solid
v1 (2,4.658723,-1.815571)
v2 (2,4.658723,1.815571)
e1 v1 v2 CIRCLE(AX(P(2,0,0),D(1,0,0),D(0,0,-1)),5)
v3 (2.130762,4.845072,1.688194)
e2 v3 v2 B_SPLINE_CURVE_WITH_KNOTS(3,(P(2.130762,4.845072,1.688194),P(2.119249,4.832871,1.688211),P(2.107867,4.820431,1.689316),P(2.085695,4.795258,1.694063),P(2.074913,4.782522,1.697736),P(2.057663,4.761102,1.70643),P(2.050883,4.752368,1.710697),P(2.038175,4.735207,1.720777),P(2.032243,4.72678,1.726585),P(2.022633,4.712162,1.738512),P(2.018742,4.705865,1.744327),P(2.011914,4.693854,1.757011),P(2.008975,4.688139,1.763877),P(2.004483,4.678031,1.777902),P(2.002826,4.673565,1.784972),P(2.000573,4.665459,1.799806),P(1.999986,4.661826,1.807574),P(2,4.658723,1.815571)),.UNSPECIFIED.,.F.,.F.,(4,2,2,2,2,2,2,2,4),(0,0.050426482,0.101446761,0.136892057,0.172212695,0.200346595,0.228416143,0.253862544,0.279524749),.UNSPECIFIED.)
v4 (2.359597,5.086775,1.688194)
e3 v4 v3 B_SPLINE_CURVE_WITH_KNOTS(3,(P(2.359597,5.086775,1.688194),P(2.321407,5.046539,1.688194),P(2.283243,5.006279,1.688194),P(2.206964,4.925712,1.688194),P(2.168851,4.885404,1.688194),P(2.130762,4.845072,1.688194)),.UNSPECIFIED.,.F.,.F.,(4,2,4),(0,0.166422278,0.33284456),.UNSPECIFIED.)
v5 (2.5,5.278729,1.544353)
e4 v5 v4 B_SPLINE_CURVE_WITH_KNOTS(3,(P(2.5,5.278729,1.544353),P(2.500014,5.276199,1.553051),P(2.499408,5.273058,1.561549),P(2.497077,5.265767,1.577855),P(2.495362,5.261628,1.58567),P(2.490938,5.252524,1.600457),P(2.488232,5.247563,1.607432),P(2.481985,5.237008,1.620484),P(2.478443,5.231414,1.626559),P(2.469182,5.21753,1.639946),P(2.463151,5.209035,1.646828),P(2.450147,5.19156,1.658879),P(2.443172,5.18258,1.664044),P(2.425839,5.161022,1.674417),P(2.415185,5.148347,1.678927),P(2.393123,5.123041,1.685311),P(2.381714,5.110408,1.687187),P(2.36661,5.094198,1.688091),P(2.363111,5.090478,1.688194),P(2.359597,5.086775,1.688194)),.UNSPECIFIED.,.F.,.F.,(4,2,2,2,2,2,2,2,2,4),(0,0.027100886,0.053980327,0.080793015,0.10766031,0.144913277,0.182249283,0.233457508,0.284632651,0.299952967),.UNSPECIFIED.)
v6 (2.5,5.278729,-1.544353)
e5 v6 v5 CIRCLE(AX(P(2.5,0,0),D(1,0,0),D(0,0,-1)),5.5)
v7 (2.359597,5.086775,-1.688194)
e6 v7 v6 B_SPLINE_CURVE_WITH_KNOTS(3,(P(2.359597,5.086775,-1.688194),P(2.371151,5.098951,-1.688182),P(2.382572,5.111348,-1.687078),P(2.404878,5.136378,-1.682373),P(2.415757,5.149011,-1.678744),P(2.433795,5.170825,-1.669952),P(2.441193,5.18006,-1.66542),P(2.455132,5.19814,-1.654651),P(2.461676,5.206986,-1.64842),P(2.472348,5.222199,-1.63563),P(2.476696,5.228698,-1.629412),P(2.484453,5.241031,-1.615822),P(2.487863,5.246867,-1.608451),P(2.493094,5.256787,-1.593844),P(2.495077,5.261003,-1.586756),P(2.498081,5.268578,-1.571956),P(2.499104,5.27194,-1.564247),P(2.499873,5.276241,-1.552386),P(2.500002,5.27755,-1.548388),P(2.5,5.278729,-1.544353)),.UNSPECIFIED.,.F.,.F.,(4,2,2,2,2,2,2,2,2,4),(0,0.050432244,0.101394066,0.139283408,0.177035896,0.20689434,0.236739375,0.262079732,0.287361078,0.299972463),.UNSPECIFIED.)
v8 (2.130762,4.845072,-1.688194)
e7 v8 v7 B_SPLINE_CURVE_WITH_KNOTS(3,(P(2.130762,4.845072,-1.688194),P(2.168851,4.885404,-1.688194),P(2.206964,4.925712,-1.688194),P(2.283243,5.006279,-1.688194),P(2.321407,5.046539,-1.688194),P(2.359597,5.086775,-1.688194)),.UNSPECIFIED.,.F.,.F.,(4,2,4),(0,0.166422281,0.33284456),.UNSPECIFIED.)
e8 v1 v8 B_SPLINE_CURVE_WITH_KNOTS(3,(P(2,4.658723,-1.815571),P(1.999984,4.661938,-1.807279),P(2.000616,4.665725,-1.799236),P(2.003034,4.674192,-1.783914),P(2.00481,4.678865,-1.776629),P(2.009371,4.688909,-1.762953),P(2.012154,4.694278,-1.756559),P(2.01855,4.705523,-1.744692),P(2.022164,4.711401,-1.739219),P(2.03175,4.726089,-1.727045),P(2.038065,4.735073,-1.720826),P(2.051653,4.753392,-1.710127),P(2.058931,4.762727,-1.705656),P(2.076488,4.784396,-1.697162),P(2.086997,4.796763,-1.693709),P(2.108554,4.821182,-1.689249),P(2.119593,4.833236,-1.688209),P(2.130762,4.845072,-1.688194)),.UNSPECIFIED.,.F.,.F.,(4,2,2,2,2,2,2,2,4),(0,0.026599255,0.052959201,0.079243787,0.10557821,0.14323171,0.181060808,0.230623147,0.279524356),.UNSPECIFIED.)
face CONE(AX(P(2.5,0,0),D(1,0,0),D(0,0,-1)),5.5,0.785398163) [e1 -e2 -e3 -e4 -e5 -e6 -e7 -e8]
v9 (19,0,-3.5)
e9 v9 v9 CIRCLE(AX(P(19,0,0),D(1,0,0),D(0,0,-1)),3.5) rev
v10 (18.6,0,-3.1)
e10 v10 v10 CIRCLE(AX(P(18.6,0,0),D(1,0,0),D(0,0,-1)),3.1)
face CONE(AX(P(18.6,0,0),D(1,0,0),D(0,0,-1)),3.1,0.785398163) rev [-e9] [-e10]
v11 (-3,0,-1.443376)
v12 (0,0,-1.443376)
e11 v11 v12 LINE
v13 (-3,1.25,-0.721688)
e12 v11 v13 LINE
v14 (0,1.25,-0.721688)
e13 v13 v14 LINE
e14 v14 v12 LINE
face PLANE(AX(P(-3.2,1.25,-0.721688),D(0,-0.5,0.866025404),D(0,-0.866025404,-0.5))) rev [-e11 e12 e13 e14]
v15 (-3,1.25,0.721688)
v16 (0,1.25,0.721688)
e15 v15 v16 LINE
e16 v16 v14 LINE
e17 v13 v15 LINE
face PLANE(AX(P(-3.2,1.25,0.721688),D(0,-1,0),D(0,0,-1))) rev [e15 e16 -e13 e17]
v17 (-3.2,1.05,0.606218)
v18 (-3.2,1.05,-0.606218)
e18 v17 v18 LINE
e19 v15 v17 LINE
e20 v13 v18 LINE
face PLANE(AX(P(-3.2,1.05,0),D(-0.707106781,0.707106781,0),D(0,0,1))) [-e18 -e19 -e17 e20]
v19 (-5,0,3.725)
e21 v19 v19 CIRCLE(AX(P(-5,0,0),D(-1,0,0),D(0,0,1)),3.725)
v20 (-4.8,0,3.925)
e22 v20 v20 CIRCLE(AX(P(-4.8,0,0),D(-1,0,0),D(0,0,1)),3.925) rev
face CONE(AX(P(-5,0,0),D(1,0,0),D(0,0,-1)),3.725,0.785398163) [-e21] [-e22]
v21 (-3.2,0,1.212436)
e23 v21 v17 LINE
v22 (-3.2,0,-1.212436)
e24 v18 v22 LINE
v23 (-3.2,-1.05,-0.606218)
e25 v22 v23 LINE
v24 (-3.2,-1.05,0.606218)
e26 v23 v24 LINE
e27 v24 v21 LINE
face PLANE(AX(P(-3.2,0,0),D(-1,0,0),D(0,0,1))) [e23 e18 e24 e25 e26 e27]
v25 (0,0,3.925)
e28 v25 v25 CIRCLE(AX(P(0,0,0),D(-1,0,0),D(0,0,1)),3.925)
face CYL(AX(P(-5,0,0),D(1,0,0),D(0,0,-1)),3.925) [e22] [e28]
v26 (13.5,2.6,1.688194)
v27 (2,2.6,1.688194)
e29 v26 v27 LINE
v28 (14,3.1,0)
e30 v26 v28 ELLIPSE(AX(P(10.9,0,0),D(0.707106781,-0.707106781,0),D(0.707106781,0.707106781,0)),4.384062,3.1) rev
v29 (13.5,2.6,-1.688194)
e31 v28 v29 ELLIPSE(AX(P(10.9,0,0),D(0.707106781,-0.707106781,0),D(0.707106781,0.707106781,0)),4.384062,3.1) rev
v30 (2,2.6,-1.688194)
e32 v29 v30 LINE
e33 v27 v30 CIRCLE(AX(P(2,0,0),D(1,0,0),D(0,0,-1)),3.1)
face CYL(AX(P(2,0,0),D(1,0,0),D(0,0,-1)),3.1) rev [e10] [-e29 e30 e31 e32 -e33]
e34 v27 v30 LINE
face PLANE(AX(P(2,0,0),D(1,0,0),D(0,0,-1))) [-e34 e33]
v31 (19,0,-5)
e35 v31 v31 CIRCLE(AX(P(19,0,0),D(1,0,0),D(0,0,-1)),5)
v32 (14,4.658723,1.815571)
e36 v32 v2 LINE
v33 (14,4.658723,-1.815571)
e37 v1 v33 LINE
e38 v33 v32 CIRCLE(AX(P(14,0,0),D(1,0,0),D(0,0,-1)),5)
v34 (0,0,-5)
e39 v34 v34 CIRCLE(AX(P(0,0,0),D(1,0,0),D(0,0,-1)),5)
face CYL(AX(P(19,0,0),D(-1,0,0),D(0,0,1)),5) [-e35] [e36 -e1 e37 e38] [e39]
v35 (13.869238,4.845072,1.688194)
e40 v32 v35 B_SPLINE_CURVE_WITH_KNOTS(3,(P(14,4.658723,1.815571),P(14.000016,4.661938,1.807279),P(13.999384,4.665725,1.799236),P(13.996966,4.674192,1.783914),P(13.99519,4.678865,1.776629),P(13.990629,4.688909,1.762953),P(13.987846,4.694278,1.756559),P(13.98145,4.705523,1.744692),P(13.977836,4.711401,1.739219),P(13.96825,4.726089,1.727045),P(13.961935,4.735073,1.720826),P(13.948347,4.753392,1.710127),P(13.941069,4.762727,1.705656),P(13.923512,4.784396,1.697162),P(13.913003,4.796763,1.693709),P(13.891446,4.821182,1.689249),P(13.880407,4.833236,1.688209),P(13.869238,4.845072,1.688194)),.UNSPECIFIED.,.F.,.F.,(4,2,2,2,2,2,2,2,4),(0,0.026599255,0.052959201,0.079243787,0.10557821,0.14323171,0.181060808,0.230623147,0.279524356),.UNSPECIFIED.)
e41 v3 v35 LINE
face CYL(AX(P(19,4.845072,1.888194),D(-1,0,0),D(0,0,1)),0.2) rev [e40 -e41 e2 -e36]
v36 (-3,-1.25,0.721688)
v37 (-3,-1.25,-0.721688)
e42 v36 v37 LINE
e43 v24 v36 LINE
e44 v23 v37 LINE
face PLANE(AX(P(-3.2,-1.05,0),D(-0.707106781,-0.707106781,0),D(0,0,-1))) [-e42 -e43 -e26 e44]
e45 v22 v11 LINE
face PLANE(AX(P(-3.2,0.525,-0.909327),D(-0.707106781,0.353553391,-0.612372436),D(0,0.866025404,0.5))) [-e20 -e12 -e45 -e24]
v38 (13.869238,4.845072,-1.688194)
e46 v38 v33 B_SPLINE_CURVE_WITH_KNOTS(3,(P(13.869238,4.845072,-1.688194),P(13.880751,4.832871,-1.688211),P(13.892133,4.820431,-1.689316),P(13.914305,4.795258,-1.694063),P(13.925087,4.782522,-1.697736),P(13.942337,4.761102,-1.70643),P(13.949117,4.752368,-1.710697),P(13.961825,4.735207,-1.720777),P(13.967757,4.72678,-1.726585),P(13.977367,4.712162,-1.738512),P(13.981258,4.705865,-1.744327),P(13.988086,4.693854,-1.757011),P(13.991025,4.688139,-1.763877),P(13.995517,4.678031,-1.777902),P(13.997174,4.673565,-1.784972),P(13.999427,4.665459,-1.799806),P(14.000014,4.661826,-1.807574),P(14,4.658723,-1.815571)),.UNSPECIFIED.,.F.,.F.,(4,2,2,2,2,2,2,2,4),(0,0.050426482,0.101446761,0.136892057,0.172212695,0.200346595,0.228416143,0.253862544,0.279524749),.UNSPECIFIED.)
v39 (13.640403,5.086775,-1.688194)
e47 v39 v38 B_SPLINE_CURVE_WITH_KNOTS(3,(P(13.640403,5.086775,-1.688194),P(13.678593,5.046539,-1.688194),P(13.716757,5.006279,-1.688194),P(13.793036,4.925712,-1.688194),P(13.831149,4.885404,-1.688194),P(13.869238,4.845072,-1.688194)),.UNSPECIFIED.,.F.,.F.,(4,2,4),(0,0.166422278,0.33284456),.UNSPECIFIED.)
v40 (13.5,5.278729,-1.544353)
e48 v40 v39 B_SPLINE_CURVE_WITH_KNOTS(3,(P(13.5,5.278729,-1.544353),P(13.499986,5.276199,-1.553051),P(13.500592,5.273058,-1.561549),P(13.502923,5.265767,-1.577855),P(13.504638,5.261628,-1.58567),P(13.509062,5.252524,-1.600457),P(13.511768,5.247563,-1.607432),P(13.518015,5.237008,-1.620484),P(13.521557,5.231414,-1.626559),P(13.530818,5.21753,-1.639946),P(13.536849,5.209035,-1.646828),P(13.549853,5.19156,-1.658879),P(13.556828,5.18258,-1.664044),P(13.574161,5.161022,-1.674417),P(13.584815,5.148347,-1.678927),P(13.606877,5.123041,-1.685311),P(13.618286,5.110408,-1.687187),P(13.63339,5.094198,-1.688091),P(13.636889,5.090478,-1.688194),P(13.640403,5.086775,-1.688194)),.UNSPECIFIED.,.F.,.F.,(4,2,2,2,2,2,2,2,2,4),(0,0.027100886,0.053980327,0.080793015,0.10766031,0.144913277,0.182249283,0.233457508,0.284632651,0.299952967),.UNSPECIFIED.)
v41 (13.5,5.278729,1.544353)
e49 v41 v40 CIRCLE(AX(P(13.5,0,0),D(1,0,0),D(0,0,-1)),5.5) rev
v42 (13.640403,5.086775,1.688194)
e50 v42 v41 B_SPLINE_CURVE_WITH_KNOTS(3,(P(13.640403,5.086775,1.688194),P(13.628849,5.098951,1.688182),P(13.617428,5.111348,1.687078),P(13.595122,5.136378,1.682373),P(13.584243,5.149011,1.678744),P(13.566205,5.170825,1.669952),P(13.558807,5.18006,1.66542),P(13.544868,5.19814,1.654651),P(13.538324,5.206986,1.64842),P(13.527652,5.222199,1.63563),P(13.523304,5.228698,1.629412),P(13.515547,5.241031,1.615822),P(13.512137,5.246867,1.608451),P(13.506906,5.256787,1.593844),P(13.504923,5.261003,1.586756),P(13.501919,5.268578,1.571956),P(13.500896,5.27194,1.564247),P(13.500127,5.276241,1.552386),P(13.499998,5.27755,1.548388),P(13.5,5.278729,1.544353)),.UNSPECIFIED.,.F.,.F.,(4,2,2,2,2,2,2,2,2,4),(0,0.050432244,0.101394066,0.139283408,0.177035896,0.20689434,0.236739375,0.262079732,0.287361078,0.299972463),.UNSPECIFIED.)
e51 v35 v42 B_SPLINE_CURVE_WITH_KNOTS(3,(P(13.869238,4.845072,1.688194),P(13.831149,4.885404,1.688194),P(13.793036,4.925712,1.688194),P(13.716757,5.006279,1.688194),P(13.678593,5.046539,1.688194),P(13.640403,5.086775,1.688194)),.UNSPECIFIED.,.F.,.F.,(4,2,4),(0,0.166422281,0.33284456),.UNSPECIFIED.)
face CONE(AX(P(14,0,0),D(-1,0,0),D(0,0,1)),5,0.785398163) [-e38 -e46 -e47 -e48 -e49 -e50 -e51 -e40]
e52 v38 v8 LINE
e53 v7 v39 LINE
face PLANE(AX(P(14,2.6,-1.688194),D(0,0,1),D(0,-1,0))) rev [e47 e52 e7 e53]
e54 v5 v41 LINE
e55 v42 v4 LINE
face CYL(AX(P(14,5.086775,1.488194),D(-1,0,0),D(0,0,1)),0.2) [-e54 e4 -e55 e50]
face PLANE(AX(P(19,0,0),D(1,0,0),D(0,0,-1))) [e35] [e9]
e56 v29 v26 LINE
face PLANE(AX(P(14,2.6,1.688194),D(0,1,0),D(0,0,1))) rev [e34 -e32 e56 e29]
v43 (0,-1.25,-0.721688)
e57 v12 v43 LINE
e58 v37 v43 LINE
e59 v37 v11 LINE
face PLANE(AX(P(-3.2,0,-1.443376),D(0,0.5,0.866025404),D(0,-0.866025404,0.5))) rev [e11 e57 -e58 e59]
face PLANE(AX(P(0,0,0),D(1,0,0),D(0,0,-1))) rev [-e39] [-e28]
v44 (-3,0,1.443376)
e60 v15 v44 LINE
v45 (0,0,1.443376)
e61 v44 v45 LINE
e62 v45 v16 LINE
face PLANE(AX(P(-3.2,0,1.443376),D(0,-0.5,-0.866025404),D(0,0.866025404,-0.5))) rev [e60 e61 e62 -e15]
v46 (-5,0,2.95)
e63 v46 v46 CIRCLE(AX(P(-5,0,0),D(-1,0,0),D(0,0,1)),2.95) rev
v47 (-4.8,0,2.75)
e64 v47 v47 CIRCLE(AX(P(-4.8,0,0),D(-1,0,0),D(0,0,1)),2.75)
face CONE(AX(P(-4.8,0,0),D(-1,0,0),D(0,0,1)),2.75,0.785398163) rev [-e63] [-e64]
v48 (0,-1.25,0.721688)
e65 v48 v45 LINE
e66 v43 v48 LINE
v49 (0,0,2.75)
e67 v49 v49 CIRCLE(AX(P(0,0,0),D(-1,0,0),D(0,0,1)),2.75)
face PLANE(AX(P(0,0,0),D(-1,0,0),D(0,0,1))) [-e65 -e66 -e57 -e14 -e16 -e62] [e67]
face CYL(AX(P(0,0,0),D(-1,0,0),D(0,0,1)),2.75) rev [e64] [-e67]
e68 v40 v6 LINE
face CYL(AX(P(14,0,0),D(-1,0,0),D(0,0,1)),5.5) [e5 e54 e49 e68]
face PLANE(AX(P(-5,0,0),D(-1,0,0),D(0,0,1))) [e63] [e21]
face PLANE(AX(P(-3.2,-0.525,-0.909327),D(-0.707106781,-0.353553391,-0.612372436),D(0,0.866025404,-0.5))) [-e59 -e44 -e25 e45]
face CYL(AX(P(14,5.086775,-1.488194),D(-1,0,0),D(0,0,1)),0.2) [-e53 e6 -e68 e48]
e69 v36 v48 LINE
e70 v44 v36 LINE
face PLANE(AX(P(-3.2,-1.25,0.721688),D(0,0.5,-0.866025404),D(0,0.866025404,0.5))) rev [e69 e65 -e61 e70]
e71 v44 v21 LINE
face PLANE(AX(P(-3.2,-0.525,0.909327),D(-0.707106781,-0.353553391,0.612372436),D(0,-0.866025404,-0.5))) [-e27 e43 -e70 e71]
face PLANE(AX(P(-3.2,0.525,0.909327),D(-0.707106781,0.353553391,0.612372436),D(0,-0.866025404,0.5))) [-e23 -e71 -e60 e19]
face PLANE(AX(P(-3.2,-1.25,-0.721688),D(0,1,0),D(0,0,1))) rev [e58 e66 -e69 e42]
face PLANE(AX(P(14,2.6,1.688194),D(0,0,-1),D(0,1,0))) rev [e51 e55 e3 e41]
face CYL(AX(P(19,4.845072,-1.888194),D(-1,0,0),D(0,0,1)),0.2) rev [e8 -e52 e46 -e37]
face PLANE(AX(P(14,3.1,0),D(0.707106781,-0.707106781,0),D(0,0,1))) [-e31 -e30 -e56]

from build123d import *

# Parameters (mm, degrees)
SKETCH_1_R          = 5
EXTRUDE_1_DEPTH     = 19
SKETCH_3_R          = 3.1
CUT_EXTRUDE_1_DEPTH = 17
EXTRUDE_2_DEPTH     = 12
SKETCH_8_R          = 3.925
EXTRUDE_4_DEPTH     = 5
SKETCH_9_R          = 2.75
CUT_EXTRUDE_2_DEPTH = 5
EXTRUDE_5_DEPTH     = 3.2
FILLET_1_R          = 0.2
CHAMFER_1_SIZE      = 0.5
CHAMFER_2_SIZE      = 0.4
CHAMFER_3_SIZE      = 0.2


with BuildPart() as part:
    # 草图1 → 凸台-拉伸1 (new body)
    with BuildSketch(Plane(origin=(0, 0, 0), x_dir=(0, 0, -1), z_dir=(1, 0, 0))):
        Circle(SKETCH_1_R)
    extrude(amount=EXTRUDE_1_DEPTH)

    # 草图3 → 切除-拉伸1 (cut)
    with BuildSketch(Plane(origin=(19, 0, 0), x_dir=(0, 0, -1), z_dir=(1, 0, 0))):
        Circle(SKETCH_3_R)
    extrude(amount=-CUT_EXTRUDE_1_DEPTH, mode=Mode.SUBTRACT)

    # 草图5 → 凸台-拉伸2 (add)
    with BuildSketch(Plane(origin=(2, 0, 0), x_dir=(0, 0, -1), z_dir=(1, 0, 0))):
        with BuildLine():
            Line((-1.688194302, 2.6), (1.688194302, 2.6))
            Line((1.688194302, 2.6), (1.688194302, 5.234500931))
            ThreePointArc((1.688194302, 5.234500931), (0, 5.5), (-1.688194302, 5.234500931))
            Line((-1.688194302, 5.234500931), (-1.688194302, 2.6))
        make_face()
    extrude(amount=EXTRUDE_2_DEPTH)

    # 草图8 → 凸台-拉伸4 (add)
    with BuildSketch(Plane.ZY):
        Circle(SKETCH_8_R)
    extrude(amount=EXTRUDE_4_DEPTH)

    # 草图9 → 切除-拉伸2 (cut)
    with BuildSketch(Plane.ZY.offset(5)):
        Circle(SKETCH_9_R)
    extrude(amount=-CUT_EXTRUDE_2_DEPTH, mode=Mode.SUBTRACT)

    # 草图10 → 凸台-拉伸5 (add)
    with BuildSketch(Plane.ZY):
        Polygon((0.721687836, 1.25), (-0.721687836, 1.25), (-1.443375673, 0), (-0.721687836, -1.25), (0.721687836, -1.25), (1.443375673, 0), align=None)
    extrude(amount=EXTRUDE_5_DEPTH)

    # 圆角1
    fillet_1_edges = [part.edges().sort_by_distance(p)[0] for p in [
        (8, 4.70637865, 1.688194302),
        (8, 5.234500931, 1.688194302),
        (8, 4.70637865, -1.688194302),
        (8, 5.234500931, -1.688194302),
    ]]
    fillet(fillet_1_edges, radius=FILLET_1_R)

    # 倒角1
    # the kernel refuses this chamfer: 0.5 mm, written as the material it takes off along each edge
    with BuildSketch(Plane(origin=(14, 0, 0), x_dir=(0, 0.8686030413593419, -0.4955085837211114), z_dir=(0, -0.4955085837211114, -0.8686030413593419))) as chamfer_1_piece_1:
        Polygon((5.5, -CHAMFER_1_SIZE), (5.5 - CHAMFER_1_SIZE, 0), (5.5, 0), align=None)
    revolve(axis=Axis((14, 0, 0), (1, 0, 0)), revolution_arc=59.40658503, mode=Mode.SUBTRACT)
    with BuildSketch(Plane(origin=(2, 0, 0), x_dir=(0, 0.8686030413593415, -0.4955085837211117), z_dir=(0, -0.4955085837211117, -0.8686030413593415))) as chamfer_1_piece_2:
        Polygon((5.5 - CHAMFER_1_SIZE, 0), (5.5, CHAMFER_1_SIZE), (5.5, 0), align=None)
    revolve(axis=Axis((2, 0, 0), (1, 0, 0)), revolution_arc=59.40658503, mode=Mode.SUBTRACT)
    with BuildSketch(Plane(origin=(14, 2.6, 2.974035796), x_dir=(0.027495876610585623, 0.9996219169112968, 0), z_dir=(0, 0, -1))) as chamfer_1_piece_3_section:
        Polygon((CHAMFER_1_SIZE * 0.999621916911, -CHAMFER_1_SIZE * 0.0274958766106), (-CHAMFER_1_SIZE * 0.0274958766106, -CHAMFER_1_SIZE * 0.999621916911), (0, 0), align=None)
    chamfer_1_piece_3 = extrude(amount=5.948071591, mode=Mode.PRIVATE)
    chamfer_1_piece_3 = chamfer_1_piece_3 & Plane(origin=(13.821912141, 0, 0), x_dir=(0, 0, -1), z_dir=(1, 0, 0)) * Cylinder(3.1, 14, mode=Mode.PRIVATE)
    add(chamfer_1_piece_3, mode=Mode.SUBTRACT)

    # 倒角2
    chamfer_2_edges = [part.edges().sort_by_distance(p)[0] for p in [
        (19, 0, 3.1),
    ]]
    chamfer(chamfer_2_edges, length=CHAMFER_2_SIZE)

    # 倒角3
    chamfer_3_edges = [part.edges().sort_by_distance(p)[0] for p in [
        (-5, 0, -3.925),
        (-5, 0, -2.75),
        (-3.2, 0.625, 1.082531755),
        (-3.2, 1.25, 0),
        (-3.2, 0.625, -1.082531755),
        (-3.2, -0.625, -1.082531755),
        (-3.2, -1.25, 0),
        (-3.2, -0.625, 1.082531755),
    ]]
    chamfer(chamfer_3_edges, length=CHAMFER_3_SIZE)


solid = part.part
